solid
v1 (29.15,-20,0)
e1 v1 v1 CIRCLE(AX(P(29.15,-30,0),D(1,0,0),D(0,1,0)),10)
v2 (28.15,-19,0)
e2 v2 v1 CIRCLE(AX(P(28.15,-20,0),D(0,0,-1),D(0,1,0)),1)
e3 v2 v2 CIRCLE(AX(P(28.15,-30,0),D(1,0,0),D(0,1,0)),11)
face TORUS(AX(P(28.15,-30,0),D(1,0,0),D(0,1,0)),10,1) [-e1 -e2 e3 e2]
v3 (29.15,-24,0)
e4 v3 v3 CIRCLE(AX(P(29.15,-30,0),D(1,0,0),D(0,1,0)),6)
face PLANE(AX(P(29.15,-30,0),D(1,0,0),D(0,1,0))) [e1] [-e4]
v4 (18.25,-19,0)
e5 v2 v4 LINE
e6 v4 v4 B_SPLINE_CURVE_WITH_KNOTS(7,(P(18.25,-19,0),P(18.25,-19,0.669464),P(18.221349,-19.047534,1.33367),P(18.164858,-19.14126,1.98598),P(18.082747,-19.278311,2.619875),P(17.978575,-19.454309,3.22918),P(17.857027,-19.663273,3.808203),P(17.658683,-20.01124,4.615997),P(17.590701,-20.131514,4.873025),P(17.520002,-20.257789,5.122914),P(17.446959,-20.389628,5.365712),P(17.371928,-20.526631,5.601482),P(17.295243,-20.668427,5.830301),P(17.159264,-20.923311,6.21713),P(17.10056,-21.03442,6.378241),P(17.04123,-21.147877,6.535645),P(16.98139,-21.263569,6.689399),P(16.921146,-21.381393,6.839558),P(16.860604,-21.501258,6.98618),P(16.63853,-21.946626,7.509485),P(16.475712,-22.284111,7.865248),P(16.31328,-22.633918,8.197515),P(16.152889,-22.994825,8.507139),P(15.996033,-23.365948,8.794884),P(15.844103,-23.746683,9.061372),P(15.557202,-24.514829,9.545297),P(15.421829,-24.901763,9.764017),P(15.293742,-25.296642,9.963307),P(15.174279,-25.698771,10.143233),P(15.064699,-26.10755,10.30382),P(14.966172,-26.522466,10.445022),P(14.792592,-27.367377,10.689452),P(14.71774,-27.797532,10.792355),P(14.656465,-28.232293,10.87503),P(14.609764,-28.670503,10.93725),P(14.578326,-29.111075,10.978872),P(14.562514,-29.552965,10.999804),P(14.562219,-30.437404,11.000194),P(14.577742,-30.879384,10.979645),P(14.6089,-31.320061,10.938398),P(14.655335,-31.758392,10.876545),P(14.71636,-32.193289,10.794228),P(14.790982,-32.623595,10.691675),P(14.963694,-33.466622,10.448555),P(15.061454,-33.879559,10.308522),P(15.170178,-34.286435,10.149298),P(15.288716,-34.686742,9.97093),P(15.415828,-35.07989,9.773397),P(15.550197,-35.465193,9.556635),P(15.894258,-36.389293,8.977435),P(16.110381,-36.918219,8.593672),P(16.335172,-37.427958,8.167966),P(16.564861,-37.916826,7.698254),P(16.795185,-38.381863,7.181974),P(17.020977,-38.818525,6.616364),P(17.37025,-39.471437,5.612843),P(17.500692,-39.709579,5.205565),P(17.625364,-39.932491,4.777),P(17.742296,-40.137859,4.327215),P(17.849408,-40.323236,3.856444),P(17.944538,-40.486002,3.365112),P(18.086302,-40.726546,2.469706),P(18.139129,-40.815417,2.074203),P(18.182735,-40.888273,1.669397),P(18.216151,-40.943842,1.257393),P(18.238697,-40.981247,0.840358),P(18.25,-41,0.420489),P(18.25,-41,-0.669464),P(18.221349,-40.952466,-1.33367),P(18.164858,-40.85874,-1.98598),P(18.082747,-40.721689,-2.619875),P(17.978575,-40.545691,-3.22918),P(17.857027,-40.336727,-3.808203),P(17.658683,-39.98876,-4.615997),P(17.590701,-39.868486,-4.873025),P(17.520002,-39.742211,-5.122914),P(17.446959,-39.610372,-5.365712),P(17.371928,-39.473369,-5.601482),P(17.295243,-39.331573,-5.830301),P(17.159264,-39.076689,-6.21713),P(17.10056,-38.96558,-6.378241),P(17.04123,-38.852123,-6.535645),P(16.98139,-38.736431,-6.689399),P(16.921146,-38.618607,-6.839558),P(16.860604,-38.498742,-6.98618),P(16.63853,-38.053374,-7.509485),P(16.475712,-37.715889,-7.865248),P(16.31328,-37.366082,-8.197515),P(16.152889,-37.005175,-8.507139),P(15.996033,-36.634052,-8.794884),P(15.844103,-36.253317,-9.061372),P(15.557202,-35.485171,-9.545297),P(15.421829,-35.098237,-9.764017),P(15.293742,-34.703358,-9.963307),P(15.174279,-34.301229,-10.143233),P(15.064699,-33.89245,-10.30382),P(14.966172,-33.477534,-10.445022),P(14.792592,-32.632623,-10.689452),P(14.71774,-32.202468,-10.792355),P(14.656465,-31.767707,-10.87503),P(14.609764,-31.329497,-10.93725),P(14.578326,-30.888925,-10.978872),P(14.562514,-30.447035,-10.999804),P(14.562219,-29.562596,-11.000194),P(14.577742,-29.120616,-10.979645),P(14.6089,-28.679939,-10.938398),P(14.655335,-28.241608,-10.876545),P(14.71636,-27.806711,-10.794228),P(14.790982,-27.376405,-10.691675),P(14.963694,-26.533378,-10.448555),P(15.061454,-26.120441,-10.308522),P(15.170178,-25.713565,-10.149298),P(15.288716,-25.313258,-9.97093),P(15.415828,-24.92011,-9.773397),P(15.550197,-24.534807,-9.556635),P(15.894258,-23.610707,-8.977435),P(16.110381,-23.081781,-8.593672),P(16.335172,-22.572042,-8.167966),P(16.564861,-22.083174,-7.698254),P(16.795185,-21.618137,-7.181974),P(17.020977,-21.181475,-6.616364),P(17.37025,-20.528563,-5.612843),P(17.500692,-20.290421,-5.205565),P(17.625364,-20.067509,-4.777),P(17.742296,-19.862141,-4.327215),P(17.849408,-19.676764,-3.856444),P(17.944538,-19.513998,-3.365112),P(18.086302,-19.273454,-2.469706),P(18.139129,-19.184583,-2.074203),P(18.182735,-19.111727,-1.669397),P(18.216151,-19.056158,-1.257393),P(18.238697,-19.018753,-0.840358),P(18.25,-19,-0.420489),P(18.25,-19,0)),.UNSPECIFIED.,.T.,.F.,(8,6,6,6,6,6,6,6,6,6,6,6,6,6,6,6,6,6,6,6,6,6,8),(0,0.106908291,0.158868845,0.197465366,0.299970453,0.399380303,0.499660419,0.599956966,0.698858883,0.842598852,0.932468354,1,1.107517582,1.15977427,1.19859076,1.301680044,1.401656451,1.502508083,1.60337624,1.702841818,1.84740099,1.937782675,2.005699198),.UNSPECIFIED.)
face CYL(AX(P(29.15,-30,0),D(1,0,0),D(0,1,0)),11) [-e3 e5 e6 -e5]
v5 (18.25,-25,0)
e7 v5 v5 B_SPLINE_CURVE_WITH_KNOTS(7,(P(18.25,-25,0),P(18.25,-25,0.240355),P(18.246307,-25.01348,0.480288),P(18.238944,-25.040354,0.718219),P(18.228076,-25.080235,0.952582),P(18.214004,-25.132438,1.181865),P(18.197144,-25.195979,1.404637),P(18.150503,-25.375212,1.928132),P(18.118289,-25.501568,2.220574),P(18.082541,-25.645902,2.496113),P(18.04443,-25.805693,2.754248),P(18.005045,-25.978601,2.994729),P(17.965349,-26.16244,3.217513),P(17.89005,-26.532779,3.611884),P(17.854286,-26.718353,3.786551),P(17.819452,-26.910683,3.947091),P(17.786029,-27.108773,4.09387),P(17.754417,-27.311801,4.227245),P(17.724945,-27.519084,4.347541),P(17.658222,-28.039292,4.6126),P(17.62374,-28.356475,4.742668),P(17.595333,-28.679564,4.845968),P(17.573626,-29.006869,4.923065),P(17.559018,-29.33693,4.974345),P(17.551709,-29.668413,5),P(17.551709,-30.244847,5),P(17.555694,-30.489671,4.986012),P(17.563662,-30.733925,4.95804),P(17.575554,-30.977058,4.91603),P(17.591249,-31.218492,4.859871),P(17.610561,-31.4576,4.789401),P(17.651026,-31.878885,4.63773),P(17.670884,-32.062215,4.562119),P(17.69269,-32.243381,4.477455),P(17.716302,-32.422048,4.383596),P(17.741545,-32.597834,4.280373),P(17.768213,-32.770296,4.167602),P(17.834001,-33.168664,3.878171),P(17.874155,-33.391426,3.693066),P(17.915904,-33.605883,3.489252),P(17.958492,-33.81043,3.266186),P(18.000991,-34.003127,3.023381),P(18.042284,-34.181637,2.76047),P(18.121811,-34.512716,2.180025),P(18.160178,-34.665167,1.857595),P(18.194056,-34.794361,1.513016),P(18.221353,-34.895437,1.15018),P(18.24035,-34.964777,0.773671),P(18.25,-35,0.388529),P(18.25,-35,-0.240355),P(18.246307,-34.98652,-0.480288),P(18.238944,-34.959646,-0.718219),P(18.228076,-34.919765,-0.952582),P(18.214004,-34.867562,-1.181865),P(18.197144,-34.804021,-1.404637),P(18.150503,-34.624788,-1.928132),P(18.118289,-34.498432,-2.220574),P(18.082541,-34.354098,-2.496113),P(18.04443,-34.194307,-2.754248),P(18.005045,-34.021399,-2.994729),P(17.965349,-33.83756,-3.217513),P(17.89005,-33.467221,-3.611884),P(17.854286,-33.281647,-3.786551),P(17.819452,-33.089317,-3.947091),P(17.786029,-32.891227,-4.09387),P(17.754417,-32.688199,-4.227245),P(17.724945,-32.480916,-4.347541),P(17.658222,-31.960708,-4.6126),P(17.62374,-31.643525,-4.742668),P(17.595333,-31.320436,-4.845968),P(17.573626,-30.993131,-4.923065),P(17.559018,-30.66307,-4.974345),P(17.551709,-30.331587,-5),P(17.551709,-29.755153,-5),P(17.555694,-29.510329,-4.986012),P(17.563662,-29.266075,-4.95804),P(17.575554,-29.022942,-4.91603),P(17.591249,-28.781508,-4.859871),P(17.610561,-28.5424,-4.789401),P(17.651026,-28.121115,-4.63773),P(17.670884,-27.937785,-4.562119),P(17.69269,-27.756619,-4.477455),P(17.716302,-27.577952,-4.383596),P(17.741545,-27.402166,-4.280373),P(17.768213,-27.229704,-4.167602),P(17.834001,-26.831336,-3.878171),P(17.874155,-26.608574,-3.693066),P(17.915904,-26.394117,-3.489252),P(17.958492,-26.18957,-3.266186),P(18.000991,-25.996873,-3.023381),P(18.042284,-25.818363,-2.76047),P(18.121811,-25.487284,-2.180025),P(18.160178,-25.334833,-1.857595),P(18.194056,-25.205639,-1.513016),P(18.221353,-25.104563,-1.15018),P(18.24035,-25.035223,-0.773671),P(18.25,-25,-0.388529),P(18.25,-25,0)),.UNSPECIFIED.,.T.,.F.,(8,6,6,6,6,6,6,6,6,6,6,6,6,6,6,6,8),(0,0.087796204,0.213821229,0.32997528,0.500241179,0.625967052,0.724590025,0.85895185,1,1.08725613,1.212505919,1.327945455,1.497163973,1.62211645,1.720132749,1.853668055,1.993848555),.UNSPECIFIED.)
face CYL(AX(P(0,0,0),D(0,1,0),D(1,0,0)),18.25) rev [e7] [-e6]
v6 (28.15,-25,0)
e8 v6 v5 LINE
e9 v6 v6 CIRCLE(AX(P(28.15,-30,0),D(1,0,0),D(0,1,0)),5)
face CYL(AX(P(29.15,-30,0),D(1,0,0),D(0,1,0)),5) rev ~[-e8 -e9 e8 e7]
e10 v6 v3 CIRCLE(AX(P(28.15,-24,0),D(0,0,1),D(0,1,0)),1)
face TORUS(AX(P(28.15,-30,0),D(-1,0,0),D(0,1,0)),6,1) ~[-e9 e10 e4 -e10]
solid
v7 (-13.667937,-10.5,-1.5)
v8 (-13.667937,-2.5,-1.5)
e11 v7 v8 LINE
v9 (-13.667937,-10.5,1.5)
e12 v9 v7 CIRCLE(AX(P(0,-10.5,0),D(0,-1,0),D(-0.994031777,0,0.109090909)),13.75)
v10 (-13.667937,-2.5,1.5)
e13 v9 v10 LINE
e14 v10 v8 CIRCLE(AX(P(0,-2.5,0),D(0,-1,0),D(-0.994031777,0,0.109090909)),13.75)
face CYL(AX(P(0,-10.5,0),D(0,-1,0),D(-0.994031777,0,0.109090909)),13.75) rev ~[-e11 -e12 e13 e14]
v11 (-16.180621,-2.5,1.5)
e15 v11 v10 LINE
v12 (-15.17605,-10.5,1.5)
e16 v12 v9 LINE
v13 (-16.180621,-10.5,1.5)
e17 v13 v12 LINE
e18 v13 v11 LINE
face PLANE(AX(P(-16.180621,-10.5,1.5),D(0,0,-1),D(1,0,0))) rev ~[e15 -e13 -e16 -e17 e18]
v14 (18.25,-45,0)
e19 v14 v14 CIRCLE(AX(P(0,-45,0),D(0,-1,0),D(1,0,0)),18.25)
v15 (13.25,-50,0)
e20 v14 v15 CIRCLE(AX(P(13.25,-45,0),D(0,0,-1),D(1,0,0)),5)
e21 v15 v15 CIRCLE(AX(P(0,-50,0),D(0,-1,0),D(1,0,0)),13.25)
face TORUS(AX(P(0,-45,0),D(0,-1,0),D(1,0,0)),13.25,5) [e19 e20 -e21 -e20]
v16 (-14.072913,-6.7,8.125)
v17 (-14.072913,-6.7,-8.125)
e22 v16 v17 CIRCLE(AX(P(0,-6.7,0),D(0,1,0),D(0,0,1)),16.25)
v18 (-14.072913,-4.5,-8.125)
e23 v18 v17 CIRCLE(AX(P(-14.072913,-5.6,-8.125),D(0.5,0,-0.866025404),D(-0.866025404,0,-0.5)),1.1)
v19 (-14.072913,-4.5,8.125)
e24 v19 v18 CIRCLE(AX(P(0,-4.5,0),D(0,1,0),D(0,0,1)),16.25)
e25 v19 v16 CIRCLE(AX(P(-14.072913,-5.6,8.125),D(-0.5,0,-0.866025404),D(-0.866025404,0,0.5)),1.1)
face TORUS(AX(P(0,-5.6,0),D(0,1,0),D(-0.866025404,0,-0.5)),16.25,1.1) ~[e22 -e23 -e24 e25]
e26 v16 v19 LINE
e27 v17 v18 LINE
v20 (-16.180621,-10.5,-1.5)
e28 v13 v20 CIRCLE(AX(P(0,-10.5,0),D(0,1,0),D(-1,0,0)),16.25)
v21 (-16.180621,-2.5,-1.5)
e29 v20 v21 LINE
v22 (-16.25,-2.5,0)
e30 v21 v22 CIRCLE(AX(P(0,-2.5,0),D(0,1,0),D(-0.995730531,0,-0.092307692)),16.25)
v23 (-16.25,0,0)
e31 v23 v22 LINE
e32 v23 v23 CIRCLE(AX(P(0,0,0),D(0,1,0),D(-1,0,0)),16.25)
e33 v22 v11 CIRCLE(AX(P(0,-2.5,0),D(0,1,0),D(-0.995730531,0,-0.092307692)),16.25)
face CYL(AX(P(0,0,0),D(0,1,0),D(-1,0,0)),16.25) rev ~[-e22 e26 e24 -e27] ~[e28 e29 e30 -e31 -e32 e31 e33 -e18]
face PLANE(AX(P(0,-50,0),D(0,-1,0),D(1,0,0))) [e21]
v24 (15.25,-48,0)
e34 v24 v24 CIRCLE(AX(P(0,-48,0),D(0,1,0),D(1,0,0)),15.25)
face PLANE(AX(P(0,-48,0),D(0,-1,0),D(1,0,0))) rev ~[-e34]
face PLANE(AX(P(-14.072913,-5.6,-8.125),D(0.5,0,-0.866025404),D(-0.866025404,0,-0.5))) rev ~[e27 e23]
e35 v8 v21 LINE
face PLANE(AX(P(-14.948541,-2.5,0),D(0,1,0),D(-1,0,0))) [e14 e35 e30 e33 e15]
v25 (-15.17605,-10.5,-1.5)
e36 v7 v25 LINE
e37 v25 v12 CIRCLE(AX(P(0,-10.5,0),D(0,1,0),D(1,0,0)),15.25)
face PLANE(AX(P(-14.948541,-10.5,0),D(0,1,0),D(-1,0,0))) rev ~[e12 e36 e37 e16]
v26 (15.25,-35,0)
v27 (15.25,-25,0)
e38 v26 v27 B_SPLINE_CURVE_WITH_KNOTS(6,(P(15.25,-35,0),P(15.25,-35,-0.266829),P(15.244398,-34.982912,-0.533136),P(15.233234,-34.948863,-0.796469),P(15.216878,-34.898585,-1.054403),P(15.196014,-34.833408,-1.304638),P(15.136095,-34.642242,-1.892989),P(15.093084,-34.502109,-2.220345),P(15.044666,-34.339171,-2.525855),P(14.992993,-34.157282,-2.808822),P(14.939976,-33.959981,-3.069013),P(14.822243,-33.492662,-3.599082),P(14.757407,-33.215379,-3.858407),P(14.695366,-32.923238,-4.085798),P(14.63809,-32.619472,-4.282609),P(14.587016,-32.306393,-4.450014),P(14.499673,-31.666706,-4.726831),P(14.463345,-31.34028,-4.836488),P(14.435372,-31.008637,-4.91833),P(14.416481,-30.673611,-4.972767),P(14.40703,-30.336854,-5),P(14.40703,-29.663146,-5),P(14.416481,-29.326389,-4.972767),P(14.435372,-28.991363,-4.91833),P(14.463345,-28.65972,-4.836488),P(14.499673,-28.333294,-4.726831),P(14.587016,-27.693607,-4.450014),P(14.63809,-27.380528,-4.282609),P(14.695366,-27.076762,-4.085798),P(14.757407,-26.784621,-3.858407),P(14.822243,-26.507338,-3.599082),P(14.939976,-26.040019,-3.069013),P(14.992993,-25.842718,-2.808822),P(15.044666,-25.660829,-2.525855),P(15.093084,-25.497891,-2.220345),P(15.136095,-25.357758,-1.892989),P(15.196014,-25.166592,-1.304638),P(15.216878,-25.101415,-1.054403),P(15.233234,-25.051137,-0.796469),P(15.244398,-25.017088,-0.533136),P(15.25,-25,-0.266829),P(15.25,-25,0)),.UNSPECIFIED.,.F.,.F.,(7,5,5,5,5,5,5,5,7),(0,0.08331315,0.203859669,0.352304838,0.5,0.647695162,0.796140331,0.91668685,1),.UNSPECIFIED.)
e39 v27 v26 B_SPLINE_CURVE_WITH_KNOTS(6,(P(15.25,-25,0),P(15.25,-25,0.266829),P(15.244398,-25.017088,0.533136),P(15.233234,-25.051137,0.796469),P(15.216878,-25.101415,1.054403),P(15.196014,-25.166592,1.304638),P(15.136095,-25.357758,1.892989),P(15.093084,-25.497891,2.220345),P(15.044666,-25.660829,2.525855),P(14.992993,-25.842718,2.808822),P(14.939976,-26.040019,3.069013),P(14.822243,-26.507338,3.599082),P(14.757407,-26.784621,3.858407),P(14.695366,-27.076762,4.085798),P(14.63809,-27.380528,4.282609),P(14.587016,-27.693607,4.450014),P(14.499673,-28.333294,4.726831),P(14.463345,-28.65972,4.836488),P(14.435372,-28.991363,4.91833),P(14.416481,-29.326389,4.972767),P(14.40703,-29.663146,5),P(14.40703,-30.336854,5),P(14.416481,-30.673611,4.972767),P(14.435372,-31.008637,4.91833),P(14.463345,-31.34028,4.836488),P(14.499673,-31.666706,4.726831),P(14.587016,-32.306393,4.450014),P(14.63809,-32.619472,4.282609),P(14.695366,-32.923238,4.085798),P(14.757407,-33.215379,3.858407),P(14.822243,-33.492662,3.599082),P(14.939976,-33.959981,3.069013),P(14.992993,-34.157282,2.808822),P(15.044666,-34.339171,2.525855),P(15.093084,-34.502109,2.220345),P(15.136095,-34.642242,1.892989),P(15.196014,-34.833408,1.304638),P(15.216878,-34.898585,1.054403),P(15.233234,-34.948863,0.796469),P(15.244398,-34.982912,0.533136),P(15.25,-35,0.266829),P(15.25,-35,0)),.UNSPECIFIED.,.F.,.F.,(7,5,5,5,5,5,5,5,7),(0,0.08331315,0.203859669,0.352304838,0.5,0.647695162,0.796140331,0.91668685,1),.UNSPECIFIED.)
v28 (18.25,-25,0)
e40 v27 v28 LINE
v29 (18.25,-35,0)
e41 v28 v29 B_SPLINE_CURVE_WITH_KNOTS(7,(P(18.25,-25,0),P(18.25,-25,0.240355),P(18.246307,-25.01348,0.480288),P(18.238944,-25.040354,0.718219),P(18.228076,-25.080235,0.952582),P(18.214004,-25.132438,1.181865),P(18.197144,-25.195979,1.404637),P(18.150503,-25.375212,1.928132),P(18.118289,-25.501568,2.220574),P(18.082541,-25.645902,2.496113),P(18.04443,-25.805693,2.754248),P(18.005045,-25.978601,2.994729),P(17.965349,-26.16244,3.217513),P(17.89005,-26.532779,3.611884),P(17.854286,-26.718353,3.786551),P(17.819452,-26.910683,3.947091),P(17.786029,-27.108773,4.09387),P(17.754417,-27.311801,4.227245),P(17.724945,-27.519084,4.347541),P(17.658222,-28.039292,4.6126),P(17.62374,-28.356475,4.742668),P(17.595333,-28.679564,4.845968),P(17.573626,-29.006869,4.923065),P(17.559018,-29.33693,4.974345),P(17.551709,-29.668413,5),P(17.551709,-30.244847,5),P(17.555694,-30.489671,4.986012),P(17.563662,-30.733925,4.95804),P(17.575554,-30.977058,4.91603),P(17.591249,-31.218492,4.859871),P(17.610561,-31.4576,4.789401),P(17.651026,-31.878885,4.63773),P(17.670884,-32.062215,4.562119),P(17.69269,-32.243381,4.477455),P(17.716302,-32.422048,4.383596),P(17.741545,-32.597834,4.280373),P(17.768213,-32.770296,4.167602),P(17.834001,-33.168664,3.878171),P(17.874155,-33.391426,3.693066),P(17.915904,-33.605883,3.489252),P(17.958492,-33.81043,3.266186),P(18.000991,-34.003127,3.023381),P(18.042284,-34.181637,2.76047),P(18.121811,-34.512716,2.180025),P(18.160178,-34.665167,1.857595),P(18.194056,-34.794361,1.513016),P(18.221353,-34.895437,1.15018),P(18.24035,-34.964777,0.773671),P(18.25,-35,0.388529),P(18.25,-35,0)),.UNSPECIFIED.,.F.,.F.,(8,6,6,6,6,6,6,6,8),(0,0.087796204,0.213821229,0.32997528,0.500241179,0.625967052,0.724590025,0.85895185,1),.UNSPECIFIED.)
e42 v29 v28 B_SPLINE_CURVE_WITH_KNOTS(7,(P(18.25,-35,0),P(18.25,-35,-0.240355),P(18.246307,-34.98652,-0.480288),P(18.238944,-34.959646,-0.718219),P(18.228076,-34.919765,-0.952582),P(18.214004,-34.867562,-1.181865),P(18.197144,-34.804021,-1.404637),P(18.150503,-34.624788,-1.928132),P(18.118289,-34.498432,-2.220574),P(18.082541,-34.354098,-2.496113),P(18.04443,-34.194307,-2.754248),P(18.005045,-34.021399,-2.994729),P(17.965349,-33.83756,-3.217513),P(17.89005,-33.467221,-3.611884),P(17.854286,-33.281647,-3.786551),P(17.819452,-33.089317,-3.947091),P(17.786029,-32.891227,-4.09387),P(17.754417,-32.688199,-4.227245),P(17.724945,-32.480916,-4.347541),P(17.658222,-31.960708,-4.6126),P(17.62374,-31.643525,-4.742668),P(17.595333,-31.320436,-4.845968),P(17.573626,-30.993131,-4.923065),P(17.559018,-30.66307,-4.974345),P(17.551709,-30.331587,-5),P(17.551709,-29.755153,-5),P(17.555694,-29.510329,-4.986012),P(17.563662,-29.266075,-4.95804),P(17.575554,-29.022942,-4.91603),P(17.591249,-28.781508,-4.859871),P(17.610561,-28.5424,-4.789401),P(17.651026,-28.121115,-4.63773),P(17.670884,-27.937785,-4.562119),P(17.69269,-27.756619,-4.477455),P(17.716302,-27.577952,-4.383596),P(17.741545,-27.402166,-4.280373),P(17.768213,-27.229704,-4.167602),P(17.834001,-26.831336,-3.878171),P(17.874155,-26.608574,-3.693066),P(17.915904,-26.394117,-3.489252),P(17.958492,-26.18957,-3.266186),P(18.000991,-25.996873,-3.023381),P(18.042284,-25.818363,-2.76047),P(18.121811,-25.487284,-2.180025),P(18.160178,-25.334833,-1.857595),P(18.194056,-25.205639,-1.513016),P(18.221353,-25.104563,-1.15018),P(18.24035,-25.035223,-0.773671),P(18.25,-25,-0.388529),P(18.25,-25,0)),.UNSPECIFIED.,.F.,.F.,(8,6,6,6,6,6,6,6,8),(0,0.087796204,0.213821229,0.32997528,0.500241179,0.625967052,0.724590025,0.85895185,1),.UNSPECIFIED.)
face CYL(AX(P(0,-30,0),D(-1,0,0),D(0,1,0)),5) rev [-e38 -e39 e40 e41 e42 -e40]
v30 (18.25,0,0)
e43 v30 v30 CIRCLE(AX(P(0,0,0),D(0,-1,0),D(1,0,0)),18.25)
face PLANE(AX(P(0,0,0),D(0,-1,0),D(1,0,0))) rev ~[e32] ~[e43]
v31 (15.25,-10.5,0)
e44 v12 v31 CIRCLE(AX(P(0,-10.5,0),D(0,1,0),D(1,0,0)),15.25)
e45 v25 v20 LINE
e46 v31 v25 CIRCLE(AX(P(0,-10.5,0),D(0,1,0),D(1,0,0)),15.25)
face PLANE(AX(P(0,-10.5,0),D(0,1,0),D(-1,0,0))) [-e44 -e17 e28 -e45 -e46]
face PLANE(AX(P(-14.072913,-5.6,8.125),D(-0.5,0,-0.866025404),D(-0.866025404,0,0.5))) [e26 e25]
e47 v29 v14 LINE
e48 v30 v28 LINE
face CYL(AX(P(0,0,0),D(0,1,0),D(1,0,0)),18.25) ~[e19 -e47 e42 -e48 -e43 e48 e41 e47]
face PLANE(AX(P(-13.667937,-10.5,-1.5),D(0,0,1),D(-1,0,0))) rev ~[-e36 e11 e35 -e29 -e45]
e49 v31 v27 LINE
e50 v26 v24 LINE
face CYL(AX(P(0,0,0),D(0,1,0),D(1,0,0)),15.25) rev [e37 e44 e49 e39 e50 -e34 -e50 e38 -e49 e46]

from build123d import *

# Parameters (mm, degrees)
F0_R           = 18.25
F0_R_2         = 15.25
F1_DEPTH       = 50
F2_R           = 18.25
F3_DEPTH       = 2
F4_R           = 5
F5_R           = 16.25
F6_DEPTH       = 10.5
F7_R           = 5
F8_DEPTH       = 18.251
F10_R          = 11
F10_R_2        = 5
F11_REACH      = 78.5136984722
F12_R          = 1
F14_DEPTH      = 8
F15_R          = 1.1
F16_ANGLE_BACK = 150
F16_ANGLE      = 300


with BuildPart() as f1:
    # F0 (on Front) → F1 (new body)
    with BuildSketch(Plane.XZ):
        Circle(F0_R)
        Circle(F0_R_2, mode=Mode.SUBTRACT)
    extrude(amount=F1_DEPTH)

    # F2 (on face) → F3 (join)
    with BuildSketch(Plane.XZ.offset(50)):
        Circle(F2_R)
    extrude(amount=-F3_DEPTH)

    # F4
    f4_edges = [f1.edges().sort_by_distance(p)[0] for p in [
        (-18.25, -50, 0),
    ]]
    fillet(f4_edges, radius=F4_R)

    # F5 (on face) → F6 (cut)
    with BuildSketch(Plane(origin=(0, 0, 0), x_dir=(-1, 0, 0), z_dir=(0, 1, 0))):
        Circle(F5_R)
    extrude(amount=-F6_DEPTH, mode=Mode.SUBTRACT)

    # F7 (on Right) → F8 (cut, through all)
    with BuildSketch(Plane.YZ):
        with Locations((-30, 0)):
            Circle(F7_R)
    extrude(amount=F8_DEPTH, mode=Mode.SUBTRACT)


with BuildPart() as f11:
    f11_end = f1.part.faces().sort_by_distance((-18.25, -22.5, 0))[0]
    # F10 (on offset) → F11 (new body, up to a face of F1 that its end follows)
    with BuildSketch(Plane.YZ.offset(29.15)):
        with Locations((-30, 0)):
            Circle(F10_R)
        with Locations((-30, 0)):
            Circle(F10_R_2, mode=Mode.SUBTRACT)
    f11_long = extrude(amount=-F11_REACH, mode=Mode.PRIVATE)
    add(split(f11_long, bisect_by=f11_end, keep=Keep.ALL, mode=Mode.PRIVATE).solids().sort_by_distance((29.15, -40.6888730163, 0))[0])

    # F12
    f12_edges = [f11.edges().sort_by_distance(p)[0] for p in [
        (29.15, -35, 0),
        (29.15, -41, 0),
    ]]
    fillet(f12_edges, radius=F12_R)


with BuildPart() as f1_1:
    add(f1.part)

    # F13 (on face) → F14 (join)
    with BuildSketch(Plane(origin=(0, -10.5, 0), x_dir=(-1, 0, 0), z_dir=(0, 1, 0))):
        with BuildLine():
            Line((13.6679369328, -1.5), (16.1806211253, -1.5))
            ThreePointArc((16.1806211253, -1.5), (16.25, 0), (16.1806211253, 1.5))
            Line((16.1806211253, 1.5), (13.6679369328, 1.5))
            ThreePointArc((13.6679369328, 1.5), (13.75, 0), (13.6679369328, -1.5))
        make_face()
    extrude(amount=F14_DEPTH)

    # F15 (on Top) → F16 (revolve)
    with BuildSketch(Plane.XY, mode=Mode.PRIVATE) as f16_sk:
        with Locations((16.25, -5.6)):
            Circle(F15_R)
    revolve(f16_sk.sketch.rotate(Axis((0, -13.1502728909, 0), (0, -1, 0)), -F16_ANGLE_BACK), axis=Axis((0, -13.1502728909, 0), (0, -1, 0)), revolution_arc=F16_ANGLE)


solid = Compound([f11.part, f1_1.part])
